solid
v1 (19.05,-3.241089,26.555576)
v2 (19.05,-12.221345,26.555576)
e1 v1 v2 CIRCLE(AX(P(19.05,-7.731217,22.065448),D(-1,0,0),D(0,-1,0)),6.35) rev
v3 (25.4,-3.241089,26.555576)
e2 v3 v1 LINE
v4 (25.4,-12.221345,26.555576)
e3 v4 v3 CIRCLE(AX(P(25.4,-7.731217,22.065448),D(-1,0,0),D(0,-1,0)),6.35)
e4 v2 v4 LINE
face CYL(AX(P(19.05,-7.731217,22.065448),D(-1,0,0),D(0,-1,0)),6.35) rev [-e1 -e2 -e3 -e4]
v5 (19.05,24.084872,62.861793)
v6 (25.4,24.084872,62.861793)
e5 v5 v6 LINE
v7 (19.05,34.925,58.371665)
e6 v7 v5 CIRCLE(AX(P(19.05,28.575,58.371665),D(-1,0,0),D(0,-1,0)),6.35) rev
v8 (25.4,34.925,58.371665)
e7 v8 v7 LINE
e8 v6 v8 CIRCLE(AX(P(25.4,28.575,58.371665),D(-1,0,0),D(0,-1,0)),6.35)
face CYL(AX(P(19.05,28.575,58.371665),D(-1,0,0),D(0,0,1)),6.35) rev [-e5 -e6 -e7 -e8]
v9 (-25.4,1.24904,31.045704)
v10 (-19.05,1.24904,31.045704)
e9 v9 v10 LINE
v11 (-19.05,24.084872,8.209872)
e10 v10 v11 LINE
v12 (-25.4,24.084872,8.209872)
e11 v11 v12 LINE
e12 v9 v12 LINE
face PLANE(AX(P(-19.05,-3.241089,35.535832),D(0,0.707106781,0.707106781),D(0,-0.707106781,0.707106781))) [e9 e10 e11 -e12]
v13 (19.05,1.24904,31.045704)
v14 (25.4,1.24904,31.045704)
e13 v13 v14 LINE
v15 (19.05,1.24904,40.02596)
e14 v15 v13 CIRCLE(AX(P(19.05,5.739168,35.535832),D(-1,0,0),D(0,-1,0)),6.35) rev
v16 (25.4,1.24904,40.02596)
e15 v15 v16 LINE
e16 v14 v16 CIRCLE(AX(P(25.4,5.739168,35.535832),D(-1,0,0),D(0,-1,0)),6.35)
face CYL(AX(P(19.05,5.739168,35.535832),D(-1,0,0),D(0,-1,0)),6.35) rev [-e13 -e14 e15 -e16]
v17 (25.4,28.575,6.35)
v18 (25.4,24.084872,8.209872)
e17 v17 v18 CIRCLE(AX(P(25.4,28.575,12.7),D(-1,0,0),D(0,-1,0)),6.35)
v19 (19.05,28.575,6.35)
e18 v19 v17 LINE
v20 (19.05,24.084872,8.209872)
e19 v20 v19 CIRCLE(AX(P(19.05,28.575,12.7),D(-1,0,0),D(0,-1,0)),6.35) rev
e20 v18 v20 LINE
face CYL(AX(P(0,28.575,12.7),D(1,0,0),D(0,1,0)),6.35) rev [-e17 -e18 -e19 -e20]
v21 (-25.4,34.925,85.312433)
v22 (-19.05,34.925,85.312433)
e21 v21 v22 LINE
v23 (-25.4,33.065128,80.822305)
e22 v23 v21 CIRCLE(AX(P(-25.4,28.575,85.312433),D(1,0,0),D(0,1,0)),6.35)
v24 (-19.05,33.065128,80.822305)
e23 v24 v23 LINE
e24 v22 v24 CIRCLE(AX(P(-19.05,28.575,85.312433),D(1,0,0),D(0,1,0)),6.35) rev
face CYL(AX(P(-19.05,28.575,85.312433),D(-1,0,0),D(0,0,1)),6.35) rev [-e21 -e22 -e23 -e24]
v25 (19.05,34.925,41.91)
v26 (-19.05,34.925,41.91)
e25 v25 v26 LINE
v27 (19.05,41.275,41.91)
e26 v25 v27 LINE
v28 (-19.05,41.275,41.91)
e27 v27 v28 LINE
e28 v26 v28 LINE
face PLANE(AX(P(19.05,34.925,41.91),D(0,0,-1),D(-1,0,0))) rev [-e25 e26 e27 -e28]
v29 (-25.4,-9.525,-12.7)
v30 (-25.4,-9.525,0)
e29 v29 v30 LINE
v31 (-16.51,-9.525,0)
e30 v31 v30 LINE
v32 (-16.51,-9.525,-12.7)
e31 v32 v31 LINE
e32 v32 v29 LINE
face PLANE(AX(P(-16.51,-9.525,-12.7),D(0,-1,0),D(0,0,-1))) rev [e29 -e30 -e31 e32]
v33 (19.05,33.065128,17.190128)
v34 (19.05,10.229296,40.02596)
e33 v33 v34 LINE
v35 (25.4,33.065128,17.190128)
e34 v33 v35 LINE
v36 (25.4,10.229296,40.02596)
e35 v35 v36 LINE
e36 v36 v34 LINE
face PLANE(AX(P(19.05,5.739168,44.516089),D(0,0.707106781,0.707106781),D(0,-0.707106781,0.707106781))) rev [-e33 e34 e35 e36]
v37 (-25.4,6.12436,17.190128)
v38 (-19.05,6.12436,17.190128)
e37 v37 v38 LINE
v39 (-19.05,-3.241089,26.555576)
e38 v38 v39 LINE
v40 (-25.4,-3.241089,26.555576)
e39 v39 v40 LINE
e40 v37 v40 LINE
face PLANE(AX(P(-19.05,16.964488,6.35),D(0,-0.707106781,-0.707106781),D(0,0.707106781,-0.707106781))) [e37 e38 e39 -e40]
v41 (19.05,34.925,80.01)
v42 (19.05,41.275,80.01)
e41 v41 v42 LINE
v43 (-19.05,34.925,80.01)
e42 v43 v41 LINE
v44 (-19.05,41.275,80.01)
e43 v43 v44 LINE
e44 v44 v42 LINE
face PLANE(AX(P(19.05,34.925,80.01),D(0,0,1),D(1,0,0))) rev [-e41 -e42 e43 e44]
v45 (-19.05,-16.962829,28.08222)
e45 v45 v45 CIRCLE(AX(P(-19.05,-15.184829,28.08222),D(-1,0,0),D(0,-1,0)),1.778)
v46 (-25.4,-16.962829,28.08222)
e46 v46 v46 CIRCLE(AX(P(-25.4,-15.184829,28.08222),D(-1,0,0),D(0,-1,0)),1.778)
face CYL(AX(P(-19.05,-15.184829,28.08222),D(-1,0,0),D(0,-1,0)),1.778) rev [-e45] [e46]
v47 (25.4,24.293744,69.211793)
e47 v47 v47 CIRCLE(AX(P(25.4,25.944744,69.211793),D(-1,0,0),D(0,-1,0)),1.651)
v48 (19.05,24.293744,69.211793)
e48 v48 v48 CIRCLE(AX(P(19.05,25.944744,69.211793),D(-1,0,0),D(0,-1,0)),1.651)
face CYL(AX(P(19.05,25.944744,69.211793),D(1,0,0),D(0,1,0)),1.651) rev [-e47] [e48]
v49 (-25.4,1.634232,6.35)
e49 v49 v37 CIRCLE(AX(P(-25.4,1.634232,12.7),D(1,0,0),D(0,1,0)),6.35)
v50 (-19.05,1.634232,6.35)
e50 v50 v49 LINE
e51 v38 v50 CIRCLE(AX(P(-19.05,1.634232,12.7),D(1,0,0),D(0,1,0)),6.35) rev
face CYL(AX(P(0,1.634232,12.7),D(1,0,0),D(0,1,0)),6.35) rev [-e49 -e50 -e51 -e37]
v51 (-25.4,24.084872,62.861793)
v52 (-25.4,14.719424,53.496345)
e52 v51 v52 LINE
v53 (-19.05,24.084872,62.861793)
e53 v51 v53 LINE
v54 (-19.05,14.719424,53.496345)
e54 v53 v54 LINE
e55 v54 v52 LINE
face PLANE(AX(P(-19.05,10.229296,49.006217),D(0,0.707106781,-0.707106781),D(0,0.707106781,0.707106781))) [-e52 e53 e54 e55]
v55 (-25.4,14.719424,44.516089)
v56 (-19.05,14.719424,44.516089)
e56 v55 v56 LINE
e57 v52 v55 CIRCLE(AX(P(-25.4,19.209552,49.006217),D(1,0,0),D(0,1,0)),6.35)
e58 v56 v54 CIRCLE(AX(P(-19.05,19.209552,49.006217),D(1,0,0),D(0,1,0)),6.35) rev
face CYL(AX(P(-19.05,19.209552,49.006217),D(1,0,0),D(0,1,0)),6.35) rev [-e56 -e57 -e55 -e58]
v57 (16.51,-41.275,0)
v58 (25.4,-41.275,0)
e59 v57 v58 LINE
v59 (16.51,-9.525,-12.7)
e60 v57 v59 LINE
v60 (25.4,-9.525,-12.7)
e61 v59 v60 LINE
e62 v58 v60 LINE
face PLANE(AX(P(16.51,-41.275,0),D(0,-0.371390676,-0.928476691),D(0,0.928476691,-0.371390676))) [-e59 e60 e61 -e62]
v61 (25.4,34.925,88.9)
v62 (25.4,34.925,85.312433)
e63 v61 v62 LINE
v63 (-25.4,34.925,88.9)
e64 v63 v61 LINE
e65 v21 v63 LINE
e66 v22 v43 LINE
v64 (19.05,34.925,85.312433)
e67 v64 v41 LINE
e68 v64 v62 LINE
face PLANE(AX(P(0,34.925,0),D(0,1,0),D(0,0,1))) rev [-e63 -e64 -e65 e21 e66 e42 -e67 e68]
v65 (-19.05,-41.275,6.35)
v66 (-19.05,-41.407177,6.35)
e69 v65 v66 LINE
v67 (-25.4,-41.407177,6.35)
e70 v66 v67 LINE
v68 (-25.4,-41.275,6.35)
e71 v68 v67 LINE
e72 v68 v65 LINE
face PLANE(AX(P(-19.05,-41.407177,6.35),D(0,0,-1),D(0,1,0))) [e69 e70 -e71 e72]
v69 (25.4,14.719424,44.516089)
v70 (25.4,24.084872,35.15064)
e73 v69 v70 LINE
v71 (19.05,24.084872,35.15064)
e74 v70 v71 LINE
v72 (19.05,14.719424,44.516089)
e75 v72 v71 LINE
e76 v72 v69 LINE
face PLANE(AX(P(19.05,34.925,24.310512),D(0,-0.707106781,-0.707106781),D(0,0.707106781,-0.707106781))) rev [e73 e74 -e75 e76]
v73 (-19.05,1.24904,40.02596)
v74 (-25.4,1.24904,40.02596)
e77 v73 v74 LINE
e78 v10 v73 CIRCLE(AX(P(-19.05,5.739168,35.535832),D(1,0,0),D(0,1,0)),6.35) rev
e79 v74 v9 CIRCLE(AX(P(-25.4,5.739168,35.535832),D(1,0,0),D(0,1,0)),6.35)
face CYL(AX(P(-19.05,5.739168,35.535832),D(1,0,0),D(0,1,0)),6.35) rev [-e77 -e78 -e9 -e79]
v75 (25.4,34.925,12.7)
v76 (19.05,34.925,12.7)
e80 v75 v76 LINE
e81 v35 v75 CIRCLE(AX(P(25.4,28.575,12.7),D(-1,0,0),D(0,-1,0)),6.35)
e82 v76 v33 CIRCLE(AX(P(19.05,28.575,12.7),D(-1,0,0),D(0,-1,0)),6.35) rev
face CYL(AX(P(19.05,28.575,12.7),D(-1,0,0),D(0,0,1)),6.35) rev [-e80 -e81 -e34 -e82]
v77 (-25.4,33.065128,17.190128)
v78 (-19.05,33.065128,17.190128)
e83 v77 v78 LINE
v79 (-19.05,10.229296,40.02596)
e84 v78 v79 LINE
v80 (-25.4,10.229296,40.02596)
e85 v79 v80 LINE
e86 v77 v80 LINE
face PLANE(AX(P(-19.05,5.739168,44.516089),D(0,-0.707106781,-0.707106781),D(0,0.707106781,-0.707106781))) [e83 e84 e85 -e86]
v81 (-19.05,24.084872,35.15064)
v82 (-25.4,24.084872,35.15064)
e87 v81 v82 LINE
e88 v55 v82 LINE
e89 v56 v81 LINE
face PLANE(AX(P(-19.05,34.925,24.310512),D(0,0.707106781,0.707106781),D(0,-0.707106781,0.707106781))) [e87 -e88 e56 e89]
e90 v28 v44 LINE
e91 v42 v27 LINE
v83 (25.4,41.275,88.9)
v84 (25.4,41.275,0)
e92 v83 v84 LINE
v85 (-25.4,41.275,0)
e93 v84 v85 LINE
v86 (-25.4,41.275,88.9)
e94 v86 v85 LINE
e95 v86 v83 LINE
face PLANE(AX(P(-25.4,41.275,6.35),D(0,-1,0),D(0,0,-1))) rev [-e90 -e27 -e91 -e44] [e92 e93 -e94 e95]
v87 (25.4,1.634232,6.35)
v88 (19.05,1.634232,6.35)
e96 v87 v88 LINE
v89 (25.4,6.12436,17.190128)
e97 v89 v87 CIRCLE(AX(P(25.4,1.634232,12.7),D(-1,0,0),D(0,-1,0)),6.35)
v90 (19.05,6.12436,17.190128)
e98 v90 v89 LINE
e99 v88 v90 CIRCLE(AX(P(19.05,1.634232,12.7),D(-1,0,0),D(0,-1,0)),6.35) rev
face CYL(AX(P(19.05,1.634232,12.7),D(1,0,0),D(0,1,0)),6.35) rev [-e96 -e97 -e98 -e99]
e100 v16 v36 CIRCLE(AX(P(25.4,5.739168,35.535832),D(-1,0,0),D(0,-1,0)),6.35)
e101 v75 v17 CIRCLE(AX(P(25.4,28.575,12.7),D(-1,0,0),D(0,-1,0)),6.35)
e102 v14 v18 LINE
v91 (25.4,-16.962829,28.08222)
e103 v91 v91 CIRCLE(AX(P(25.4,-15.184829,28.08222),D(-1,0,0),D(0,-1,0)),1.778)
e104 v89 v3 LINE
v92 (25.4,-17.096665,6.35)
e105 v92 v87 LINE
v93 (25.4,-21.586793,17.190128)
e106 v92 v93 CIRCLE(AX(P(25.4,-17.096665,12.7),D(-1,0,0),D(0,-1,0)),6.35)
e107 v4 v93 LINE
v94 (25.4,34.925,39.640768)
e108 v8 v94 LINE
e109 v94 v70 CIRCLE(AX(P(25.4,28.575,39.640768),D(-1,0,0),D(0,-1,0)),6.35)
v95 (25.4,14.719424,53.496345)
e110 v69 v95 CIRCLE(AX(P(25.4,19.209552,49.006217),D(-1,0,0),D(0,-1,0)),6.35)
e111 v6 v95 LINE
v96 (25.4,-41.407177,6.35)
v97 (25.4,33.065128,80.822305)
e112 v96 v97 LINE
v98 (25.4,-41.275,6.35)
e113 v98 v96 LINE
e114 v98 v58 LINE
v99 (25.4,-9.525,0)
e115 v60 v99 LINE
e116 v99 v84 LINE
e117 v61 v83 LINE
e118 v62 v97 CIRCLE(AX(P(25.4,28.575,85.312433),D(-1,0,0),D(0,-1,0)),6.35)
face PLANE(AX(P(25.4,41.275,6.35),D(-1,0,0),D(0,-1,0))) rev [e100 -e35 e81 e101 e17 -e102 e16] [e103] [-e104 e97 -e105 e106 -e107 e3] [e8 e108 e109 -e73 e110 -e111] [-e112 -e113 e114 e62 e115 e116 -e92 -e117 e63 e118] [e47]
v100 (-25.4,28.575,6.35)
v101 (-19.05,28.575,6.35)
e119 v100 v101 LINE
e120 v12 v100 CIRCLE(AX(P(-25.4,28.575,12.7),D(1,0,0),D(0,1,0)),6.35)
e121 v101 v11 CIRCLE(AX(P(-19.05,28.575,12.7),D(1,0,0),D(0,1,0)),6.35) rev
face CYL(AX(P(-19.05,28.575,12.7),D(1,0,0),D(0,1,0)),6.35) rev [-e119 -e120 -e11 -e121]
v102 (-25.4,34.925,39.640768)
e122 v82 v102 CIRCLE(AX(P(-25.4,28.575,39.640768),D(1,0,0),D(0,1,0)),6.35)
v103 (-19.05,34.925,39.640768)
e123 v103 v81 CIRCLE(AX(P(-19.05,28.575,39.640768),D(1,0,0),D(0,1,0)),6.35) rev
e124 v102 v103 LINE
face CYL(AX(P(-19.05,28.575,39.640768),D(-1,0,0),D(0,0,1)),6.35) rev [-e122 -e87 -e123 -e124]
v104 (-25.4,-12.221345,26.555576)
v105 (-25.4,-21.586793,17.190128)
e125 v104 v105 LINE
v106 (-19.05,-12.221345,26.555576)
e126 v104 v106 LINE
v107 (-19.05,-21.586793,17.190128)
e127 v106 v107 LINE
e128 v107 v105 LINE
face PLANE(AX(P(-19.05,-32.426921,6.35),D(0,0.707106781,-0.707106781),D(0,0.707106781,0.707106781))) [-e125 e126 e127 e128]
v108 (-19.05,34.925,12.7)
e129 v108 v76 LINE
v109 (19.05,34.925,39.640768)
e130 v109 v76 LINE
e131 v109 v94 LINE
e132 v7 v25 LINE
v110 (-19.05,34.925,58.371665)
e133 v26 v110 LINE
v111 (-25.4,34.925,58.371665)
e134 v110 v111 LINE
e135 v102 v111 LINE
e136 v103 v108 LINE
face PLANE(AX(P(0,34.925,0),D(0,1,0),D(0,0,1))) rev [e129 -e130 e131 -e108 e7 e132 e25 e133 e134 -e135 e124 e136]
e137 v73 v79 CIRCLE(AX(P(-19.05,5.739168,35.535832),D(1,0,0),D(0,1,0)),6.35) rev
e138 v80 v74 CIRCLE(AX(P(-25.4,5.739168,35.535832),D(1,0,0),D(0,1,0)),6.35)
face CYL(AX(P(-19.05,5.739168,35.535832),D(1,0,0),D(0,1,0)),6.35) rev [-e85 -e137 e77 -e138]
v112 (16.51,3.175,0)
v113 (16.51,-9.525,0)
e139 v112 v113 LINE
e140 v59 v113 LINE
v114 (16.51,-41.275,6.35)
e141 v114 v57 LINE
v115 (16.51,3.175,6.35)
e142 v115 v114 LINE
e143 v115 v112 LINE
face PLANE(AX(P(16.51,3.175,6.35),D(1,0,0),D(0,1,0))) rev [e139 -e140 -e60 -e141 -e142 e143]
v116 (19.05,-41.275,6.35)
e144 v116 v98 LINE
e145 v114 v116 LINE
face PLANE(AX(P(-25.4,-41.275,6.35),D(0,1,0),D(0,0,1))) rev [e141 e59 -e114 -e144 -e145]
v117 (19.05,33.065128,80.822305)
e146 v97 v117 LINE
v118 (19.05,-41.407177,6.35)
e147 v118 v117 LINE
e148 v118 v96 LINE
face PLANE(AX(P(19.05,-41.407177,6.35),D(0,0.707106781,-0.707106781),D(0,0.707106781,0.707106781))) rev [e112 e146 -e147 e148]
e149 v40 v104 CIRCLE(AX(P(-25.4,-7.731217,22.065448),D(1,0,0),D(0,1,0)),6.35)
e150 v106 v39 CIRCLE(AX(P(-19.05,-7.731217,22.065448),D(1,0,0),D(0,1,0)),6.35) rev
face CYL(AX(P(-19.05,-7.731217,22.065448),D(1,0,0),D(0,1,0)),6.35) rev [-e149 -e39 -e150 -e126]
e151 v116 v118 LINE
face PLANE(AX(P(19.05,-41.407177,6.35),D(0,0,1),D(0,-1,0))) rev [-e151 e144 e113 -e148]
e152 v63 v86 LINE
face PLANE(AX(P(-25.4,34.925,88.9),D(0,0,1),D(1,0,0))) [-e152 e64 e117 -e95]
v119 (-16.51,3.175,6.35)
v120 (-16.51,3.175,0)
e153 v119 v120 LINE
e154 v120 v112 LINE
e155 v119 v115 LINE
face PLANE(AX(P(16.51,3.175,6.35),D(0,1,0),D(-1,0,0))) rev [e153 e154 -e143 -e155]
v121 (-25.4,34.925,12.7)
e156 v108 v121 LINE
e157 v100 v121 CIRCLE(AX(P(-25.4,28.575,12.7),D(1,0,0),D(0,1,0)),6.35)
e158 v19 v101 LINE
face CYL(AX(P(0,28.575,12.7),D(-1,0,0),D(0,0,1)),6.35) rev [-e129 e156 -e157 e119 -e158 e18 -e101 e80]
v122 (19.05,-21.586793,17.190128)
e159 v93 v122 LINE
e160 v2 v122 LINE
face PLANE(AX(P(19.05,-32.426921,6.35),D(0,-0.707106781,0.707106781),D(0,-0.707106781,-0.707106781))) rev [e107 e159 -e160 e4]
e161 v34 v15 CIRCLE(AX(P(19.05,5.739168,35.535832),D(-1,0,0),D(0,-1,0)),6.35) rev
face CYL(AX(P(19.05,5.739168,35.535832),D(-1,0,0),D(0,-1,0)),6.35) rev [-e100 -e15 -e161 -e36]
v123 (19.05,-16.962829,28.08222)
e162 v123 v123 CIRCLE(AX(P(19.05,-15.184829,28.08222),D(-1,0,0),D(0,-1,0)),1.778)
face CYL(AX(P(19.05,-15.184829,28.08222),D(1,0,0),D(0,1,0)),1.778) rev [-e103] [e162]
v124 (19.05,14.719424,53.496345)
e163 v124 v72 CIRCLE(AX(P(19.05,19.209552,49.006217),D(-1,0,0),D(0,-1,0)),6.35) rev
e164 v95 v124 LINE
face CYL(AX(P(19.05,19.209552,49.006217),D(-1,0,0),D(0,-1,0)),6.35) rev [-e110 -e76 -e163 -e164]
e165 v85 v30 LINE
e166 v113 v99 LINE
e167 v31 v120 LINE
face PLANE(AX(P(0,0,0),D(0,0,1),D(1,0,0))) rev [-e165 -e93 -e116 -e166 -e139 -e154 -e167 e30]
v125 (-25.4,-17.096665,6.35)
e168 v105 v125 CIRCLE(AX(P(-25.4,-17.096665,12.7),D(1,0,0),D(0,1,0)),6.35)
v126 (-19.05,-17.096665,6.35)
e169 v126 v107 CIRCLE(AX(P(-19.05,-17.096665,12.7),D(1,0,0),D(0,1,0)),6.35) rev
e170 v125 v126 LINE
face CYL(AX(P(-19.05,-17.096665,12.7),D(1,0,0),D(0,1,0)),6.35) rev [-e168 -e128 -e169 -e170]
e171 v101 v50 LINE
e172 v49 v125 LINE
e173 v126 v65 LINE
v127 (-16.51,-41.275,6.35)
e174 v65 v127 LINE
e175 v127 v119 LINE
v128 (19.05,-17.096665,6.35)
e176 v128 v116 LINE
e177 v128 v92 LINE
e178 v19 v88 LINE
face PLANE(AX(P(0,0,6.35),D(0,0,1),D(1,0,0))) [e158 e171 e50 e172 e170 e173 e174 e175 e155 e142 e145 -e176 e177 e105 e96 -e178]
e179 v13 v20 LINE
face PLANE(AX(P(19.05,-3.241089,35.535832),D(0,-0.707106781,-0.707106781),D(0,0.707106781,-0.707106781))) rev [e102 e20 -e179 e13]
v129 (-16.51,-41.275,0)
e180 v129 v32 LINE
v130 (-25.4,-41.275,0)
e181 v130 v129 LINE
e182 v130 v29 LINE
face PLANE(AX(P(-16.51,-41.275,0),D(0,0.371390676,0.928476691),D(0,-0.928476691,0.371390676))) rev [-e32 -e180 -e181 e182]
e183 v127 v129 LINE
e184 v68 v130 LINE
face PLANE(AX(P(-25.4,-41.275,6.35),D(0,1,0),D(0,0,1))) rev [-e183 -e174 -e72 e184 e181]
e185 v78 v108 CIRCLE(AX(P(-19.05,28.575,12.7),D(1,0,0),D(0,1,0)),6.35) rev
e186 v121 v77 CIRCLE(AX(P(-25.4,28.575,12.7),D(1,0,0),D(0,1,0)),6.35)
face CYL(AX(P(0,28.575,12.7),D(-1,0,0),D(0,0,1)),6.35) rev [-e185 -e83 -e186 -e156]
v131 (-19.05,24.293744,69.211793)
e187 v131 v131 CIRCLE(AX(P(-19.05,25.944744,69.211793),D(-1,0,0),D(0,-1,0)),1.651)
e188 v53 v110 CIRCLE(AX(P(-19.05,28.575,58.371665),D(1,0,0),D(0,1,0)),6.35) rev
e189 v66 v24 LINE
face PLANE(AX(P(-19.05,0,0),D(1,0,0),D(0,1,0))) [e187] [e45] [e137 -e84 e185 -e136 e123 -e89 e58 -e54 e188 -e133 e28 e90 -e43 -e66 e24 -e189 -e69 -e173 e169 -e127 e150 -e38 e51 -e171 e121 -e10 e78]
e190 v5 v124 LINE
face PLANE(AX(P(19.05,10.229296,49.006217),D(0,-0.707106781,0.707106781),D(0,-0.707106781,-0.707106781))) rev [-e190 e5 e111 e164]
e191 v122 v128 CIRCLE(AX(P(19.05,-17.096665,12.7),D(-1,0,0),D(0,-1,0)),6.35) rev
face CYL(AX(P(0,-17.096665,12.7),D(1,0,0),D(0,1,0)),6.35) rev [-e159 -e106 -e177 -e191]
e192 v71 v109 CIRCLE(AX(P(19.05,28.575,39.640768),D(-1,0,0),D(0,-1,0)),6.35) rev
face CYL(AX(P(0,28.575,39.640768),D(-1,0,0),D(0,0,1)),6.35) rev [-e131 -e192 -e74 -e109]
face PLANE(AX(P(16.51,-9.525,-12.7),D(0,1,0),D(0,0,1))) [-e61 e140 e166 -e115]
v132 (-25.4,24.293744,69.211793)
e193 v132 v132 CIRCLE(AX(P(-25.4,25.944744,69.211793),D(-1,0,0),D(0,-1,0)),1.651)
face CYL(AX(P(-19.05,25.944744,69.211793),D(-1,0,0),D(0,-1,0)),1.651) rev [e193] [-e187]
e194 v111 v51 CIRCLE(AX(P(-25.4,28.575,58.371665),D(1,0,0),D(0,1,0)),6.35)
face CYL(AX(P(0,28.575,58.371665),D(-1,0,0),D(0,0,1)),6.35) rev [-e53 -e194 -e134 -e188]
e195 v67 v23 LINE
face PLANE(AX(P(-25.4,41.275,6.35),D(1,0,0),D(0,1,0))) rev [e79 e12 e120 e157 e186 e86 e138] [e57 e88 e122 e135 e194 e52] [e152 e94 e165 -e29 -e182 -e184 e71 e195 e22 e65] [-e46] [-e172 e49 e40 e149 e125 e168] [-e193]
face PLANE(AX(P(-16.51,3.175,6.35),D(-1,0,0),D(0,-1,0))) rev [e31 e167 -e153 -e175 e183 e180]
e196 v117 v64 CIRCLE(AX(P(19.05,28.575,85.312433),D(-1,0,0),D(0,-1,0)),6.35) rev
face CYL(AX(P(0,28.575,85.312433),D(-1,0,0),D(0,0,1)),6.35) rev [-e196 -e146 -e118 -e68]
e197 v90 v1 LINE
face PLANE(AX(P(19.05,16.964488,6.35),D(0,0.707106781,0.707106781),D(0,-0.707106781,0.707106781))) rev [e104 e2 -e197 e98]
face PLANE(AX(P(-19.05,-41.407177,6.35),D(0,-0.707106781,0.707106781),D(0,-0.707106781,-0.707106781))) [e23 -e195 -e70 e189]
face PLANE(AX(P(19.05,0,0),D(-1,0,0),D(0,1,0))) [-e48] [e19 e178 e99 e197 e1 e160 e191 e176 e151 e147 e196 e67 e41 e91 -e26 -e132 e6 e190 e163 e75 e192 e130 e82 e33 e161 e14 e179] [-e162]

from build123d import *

# Parameters (mm, degrees)
ESQUISSE1_W             = 50.8
ESQUISSE1_H             = 82.55
BOSS_EXTRU_1_DEPTH      = 6.35
ESQUISSE2_W             = 50.8
ESQUISSE2_H             = 82.55
BOSS_EXTRU_2_DEPTH      = 6.35
ESQUISSE4_R             = 1.778
ESQUISSE4_R_2           = 1.651
BOSS_EXTRU_3_DEPTH      = 6.35
ESQUISSE5_W             = 38.1
ESQUISSE5_H             = 38.1
ENL_V_MAT_EXTRU_1_DEPTH = 6.35
ESQUISSE7_W             = 33.02
ESQUISSE7_H             = 44.45
ENL_V_MAT_EXTRU_2_DEPTH = 6.35
BOSS_EXTRU_4_DEPTH      = 8.89
CONG_1_R                = 6.35


with BuildPart() as part:
    # Esquisse1 → Boss.-Extru.1 (new body)
    with BuildSketch(Plane.XY):
        Rectangle(ESQUISSE1_W, ESQUISSE1_H)
    extrude(amount=BOSS_EXTRU_1_DEPTH)

    # Esquisse2 → Boss.-Extru.2 (add)
    with BuildSketch(Plane(origin=(0, 41.275, 0), x_dir=(1, 0, 0), z_dir=(0, 1, 0))):
        with Locations((0, -47.625)):
            Rectangle(ESQUISSE2_W, ESQUISSE2_H)
    extrude(amount=-BOSS_EXTRU_2_DEPTH)

    # Esquisse4 → Boss.-Extru.3 (add)
    with BuildSketch(Plane.ZY.offset(25.4)):
        Polygon((6.35, -32.426920908), (31.045704333, -7.731216575), (6.35, 16.964487758), (6.35, 25.944743879), (35.535832393, -3.241088515), (44.516088515, 5.739167607), (15.330256121, 34.925), (24.310512242, 34.925), (49.006216575, 10.229295667), (73.701920908, 34.925), (82.682177029, 34.925), (6.35, -41.407177029), align=None)
        with Locations(Location((28.082219813, -15.184829156, 0), (0, 0, 270))):
            Circle(ESQUISSE4_R, mode=Mode.SUBTRACT)
        with Locations(Location((69.211792847, 25.944743879, 0), (0, 0, 270))):
            Circle(ESQUISSE4_R_2, mode=Mode.SUBTRACT)
    boss_extru_3 = extrude(amount=-BOSS_EXTRU_3_DEPTH)

    # Symétrie1: Boss.-Extru.3 across plane
    add(boss_extru_3.mirror(Plane(origin=(0, 0, 0), x_dir=(0, 0, 1), z_dir=(1, 0, 0))))

    # Esquisse5 → Enlèv. mat.-Extru.1 (cut)
    with BuildSketch(Plane(origin=(0, 41.275, 0), x_dir=(1, 0, 0), z_dir=(0, 1, 0))):
        with Locations((0, -60.96)):
            Rectangle(ESQUISSE5_W, ESQUISSE5_H)
    extrude(amount=-ENL_V_MAT_EXTRU_1_DEPTH, mode=Mode.SUBTRACT)

    # Esquisse7 → Enlèv. mat.-Extru.2 (cut)
    with BuildSketch(Plane(origin=(0, 0, 0), x_dir=(-1, 0, 0), z_dir=(0, 0, -1))):
        with Locations((0, -19.05)):
            Rectangle(ESQUISSE7_W, ESQUISSE7_H)
    extrude(amount=-ENL_V_MAT_EXTRU_2_DEPTH, mode=Mode.SUBTRACT)

    # Esquisse8 → Boss.-Extru.4 (add)
    with BuildSketch(Plane(origin=(25.4, 0, 0), x_dir=(0, 0, -1), z_dir=(1, 0, 0))):
        Polygon((0, -41.275), (12.7, -9.525), (0, -9.525), align=None)
    boss_extru_4 = extrude(amount=-BOSS_EXTRU_4_DEPTH)

    # Symétrie2: Boss.-Extru.4 across plane
    add(boss_extru_4.mirror(Plane(origin=(0, 0, 0), x_dir=(0, 0, 1), z_dir=(1, 0, 0))))

    # Congé1
    cong_1_edges = [part.edges().sort_by_distance(p)[0] for p in [
        (0, 34.925, 6.35),
        (-22.225, -32.426920908, 6.35),
        (-22.225, -7.731216575, 31.045704333),
        (-22.225, 16.964487758, 6.35),
        (-22.225, 25.944743879, 6.35),
        (-22.225, -3.241088515, 35.535832393),
        (-22.225, 5.739167607, 44.516088515),
        (-22.225, 34.925, 15.330256121),
        (-22.225, 34.925, 24.310512242),
        (-22.225, 10.229295667, 49.006216575),
        (-22.225, 34.925, 73.701920908),
        (-22.225, 34.925, 82.682177029),
        (22.225, -32.426920908, 6.35),
        (22.225, 34.925, 82.682177029),
        (22.225, 34.925, 73.701920908),
        (22.225, 10.229295667, 49.006216575),
        (22.225, 34.925, 24.310512242),
        (22.225, 34.925, 15.330256121),
        (22.225, 5.739167607, 44.516088515),
        (22.225, -3.241088515, 35.535832393),
        (22.225, 25.944743879, 6.35),
        (22.225, 16.964487758, 6.35),
        (22.225, -7.731216575, 31.045704333),
    ]]
    fillet(cong_1_edges, radius=CONG_1_R - 0.0001)  # a hair under: the kernel refuses the full size


solid = part.part
